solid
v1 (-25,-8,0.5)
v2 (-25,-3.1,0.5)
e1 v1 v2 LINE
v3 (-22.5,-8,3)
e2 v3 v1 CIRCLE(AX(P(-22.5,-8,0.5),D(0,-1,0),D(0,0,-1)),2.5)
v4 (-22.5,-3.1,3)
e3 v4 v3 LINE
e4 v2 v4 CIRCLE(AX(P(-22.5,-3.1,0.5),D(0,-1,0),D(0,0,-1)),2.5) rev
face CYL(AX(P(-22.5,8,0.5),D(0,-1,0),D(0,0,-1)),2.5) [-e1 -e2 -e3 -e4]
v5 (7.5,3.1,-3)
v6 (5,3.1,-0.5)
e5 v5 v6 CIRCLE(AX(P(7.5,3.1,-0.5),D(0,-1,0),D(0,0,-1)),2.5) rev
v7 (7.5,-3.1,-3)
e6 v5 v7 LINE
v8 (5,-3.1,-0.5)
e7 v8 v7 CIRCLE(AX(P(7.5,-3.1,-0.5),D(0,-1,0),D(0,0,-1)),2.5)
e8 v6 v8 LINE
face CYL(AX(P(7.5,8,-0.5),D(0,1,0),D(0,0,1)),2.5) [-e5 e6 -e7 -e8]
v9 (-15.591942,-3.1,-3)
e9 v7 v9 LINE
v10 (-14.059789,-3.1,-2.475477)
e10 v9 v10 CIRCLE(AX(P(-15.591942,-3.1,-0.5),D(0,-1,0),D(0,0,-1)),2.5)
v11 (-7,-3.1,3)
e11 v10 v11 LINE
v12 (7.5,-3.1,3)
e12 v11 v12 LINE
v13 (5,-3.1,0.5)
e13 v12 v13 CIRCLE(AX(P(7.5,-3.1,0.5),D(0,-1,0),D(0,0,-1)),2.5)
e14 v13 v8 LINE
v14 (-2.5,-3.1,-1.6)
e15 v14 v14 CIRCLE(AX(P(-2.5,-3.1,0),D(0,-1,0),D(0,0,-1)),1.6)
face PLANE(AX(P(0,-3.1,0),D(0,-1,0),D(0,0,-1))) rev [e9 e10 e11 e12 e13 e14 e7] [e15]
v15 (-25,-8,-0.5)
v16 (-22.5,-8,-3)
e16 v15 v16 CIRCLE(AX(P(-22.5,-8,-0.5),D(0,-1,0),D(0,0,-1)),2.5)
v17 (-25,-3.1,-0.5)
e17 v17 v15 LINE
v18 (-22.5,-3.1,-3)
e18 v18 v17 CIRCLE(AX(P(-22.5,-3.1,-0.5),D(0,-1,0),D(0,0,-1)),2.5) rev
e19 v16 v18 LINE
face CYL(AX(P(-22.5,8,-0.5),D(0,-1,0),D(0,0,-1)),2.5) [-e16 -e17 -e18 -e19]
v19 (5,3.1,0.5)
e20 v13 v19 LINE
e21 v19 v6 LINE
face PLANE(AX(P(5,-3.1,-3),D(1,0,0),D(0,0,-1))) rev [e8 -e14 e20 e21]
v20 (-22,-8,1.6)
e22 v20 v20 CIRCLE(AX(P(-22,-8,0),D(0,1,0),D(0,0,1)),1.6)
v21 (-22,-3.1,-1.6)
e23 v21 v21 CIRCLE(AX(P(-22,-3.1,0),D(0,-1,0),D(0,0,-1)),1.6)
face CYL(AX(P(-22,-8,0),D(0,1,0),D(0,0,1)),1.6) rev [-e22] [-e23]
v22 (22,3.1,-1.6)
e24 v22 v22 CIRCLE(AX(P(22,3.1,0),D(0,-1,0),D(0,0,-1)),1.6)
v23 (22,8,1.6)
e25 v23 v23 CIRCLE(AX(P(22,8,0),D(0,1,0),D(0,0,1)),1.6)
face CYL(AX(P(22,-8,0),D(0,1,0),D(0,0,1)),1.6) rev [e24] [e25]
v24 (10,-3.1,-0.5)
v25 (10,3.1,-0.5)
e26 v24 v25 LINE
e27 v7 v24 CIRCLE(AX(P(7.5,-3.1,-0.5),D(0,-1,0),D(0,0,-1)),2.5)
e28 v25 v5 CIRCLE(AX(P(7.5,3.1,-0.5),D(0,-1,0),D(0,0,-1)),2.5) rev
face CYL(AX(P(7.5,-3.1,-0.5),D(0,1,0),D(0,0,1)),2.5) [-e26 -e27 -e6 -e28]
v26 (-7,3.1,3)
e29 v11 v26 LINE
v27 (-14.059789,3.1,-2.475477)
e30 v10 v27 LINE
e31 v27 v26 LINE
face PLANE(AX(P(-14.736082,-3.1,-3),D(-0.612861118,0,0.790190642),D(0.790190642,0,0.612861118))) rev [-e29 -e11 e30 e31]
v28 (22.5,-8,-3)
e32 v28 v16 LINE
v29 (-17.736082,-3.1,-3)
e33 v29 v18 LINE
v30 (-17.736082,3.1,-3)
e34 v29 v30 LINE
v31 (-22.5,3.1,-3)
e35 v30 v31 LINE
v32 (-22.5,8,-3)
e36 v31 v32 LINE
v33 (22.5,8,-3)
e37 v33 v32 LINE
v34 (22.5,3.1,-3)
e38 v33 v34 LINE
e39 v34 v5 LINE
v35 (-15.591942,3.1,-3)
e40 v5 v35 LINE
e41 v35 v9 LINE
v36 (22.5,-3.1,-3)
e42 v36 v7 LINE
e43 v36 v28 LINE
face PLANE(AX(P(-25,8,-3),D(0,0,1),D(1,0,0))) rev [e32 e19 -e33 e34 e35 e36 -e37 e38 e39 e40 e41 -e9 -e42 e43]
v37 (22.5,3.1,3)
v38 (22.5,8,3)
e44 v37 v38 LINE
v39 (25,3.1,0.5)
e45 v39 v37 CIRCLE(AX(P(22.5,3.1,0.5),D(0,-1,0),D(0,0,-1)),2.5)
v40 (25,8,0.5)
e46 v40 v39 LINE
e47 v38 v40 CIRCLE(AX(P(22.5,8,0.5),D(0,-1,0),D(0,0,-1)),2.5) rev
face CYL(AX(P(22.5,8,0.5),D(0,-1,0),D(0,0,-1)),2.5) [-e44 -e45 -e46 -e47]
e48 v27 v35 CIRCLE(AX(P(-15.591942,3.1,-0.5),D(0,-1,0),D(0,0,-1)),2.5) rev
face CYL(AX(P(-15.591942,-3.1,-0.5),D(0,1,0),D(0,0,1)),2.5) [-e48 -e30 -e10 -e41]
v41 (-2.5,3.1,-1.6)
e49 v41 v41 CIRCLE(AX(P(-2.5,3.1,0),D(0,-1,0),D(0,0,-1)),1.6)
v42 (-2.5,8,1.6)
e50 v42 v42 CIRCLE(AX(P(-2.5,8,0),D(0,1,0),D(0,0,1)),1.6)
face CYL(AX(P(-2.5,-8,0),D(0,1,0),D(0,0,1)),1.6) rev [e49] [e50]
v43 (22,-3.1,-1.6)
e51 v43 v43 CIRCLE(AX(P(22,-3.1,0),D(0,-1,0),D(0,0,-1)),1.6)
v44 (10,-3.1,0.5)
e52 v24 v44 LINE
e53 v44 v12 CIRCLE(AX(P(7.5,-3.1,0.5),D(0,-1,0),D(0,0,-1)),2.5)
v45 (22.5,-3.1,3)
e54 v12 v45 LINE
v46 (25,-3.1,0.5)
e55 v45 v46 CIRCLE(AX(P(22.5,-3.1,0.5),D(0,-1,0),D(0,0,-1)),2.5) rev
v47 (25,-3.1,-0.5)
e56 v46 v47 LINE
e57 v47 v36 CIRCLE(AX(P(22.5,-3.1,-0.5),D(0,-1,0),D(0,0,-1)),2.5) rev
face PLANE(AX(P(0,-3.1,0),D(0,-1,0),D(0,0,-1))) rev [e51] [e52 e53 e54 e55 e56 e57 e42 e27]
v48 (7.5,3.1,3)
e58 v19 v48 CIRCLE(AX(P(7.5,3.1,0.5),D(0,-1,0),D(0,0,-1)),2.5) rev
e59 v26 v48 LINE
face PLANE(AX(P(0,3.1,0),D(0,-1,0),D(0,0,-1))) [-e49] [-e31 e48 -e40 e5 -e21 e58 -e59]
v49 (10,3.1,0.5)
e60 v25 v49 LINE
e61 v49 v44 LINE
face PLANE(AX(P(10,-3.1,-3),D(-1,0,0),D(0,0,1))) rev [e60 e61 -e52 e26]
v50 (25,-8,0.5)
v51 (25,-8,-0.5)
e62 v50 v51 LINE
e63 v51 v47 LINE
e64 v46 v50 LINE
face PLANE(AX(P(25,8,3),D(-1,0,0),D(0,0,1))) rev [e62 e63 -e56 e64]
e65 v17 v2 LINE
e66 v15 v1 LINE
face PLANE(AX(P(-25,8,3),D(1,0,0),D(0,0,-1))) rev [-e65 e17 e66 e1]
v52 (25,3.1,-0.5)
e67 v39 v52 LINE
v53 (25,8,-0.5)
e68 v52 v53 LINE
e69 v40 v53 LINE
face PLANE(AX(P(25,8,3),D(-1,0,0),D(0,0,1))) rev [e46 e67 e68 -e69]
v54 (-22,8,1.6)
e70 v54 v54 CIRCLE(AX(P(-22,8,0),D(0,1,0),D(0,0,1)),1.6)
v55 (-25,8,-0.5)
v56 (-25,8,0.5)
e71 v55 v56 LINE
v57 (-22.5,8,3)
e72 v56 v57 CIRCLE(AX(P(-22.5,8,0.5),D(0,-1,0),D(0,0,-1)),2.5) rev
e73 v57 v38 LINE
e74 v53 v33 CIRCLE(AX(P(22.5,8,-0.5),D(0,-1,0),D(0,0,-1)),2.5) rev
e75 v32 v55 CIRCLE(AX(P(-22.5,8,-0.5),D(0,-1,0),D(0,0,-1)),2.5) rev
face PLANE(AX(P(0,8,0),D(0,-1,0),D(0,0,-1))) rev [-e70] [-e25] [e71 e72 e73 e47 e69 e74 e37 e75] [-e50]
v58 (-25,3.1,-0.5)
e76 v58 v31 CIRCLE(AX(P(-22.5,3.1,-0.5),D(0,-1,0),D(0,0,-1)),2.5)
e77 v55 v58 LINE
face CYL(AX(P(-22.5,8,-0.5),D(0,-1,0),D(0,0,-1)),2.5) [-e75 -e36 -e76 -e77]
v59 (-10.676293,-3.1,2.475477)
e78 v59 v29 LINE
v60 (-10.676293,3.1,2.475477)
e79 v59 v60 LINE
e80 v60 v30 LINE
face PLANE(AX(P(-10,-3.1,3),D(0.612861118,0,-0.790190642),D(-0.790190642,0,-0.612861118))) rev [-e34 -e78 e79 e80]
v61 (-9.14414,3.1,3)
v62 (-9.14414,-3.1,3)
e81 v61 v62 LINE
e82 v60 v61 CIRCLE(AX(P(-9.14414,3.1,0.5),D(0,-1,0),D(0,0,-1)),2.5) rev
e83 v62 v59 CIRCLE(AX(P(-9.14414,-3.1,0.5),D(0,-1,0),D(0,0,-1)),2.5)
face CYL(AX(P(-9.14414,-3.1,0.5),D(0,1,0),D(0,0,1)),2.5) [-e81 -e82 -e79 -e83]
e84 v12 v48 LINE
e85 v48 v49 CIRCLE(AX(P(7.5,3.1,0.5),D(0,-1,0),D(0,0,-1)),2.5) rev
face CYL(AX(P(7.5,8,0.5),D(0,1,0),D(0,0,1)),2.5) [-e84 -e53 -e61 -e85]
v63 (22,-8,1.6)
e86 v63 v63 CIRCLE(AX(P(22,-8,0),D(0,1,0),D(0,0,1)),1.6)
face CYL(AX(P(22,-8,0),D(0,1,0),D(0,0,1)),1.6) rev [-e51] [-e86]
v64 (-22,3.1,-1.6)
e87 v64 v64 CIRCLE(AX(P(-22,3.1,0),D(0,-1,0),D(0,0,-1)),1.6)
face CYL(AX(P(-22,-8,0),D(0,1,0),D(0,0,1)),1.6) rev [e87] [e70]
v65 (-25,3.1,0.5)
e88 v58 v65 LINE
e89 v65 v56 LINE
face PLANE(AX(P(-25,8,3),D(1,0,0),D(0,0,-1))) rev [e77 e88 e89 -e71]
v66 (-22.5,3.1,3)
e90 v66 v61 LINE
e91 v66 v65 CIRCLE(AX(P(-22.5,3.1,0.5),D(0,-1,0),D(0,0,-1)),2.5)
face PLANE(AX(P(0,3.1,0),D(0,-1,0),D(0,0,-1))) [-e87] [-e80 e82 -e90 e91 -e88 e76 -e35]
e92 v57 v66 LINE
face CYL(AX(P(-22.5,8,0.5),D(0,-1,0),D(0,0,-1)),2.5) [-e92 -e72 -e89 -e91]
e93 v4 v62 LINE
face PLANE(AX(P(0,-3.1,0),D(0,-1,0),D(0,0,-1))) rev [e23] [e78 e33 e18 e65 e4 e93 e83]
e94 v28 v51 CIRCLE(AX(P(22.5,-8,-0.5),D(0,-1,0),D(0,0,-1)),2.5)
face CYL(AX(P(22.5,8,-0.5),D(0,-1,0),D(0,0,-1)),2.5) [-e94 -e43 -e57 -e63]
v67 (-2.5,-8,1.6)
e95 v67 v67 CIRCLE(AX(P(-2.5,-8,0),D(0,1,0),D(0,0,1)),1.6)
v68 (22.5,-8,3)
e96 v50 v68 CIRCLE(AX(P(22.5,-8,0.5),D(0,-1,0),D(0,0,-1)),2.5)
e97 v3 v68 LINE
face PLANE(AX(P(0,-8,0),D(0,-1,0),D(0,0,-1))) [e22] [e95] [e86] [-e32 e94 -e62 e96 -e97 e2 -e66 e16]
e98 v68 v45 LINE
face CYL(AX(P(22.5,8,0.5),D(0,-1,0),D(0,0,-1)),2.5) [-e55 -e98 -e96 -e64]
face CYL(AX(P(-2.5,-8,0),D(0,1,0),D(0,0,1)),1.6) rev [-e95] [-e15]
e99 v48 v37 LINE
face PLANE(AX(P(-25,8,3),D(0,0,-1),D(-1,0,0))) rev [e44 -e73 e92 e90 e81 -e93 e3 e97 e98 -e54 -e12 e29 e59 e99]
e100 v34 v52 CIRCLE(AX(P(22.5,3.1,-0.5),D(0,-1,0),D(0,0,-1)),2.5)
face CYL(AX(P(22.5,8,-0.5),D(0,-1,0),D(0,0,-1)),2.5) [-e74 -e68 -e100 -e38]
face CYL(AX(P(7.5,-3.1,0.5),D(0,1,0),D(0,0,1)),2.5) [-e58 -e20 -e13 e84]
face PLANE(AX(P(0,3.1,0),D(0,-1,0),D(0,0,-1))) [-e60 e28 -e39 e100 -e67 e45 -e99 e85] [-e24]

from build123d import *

# Parameters (mm, degrees)
SKETCH1_W               = 50
SKETCH1_H               = 6
BOSS_EXTRUDE1_DEPTH     = 8
SKETCH2_W               = 15
SKETCH2_H               = 6
CUT_EXTRUDE1_DEPTH      = 3.1
CUT_EXTRUDE2_DEPTH      = 27.419689627
CUT_EXTRUDE2_DEPTH_BACK = 27.419689627
SKETCH3_R               = 1.6
FILLET1_R               = 2.5


with BuildPart() as part:
    # Sketch1 → Boss-Extrude1 (new, symmetric)
    with BuildSketch(Plane(origin=(0, 0, 0), x_dir=(1, 0, 0), z_dir=(0, 1, 0))):
        Rectangle(SKETCH1_W, SKETCH1_H)
    extrude(amount=BOSS_EXTRUDE1_DEPTH, both=True)

    # Sketch2 → Cut-Extrude1 (cut, symmetric)
    with BuildSketch(Plane(origin=(0, 0, 0), x_dir=(1, 0, 0), z_dir=(0, 1, 0))):
        Polygon((-25, -3), (-10, -3), (-17.736081979, 3), (-25, 3), align=None)
        with Locations((17.5, 0)):
            Rectangle(SKETCH2_W, SKETCH2_H)
        Polygon((5, 3), (-14.736081979, 3), (-7, -3), (5, -3), align=None)
    extrude(amount=CUT_EXTRUDE1_DEPTH, both=True, mode=Mode.SUBTRACT)

    # Sketch3 → Cut-Extrude2 (cut, two sides: drawn at the far end of the back side and taken through both)
    with BuildSketch(Plane(origin=(0, 0, 0), x_dir=(1, 0, 0), z_dir=(0, 1, 0)).offset(-CUT_EXTRUDE2_DEPTH_BACK)):
        with Locations(Location((-22, 0, 0), (0, 0, 270))):
            Circle(SKETCH3_R)
        with Locations(Location((22, 0, 0), (0, 0, 270))):
            Circle(SKETCH3_R)
        with Locations(Location((-2.5, 0, 0), (0, 0, 270))):
            Circle(SKETCH3_R)
    extrude(amount=CUT_EXTRUDE2_DEPTH + CUT_EXTRUDE2_DEPTH_BACK, mode=Mode.SUBTRACT)

    # Fillet1
    fillet1_edges = [part.edges().sort_by_distance(p)[0] for p in [
        (25, -5.55, 3),
        (-25, -5.55, 3),
        (-25, -5.55, -3),
        (25, -5.55, -3),
        (5, 0, -3),
        (5, 0, 3),
        (-14.736081979, 0, -3),
        (10, 0, 3),
        (10, 0, -3),
        (-10, 0, 3),
        (25, 5.55, 3),
        (-25, 5.55, 3),
        (-25, 5.55, -3),
        (25, 5.55, -3),
    ]]
    fillet(fillet1_edges, radius=FILLET1_R - 0.0001)  # a hair under: the kernel refuses the full size


solid = part.part
